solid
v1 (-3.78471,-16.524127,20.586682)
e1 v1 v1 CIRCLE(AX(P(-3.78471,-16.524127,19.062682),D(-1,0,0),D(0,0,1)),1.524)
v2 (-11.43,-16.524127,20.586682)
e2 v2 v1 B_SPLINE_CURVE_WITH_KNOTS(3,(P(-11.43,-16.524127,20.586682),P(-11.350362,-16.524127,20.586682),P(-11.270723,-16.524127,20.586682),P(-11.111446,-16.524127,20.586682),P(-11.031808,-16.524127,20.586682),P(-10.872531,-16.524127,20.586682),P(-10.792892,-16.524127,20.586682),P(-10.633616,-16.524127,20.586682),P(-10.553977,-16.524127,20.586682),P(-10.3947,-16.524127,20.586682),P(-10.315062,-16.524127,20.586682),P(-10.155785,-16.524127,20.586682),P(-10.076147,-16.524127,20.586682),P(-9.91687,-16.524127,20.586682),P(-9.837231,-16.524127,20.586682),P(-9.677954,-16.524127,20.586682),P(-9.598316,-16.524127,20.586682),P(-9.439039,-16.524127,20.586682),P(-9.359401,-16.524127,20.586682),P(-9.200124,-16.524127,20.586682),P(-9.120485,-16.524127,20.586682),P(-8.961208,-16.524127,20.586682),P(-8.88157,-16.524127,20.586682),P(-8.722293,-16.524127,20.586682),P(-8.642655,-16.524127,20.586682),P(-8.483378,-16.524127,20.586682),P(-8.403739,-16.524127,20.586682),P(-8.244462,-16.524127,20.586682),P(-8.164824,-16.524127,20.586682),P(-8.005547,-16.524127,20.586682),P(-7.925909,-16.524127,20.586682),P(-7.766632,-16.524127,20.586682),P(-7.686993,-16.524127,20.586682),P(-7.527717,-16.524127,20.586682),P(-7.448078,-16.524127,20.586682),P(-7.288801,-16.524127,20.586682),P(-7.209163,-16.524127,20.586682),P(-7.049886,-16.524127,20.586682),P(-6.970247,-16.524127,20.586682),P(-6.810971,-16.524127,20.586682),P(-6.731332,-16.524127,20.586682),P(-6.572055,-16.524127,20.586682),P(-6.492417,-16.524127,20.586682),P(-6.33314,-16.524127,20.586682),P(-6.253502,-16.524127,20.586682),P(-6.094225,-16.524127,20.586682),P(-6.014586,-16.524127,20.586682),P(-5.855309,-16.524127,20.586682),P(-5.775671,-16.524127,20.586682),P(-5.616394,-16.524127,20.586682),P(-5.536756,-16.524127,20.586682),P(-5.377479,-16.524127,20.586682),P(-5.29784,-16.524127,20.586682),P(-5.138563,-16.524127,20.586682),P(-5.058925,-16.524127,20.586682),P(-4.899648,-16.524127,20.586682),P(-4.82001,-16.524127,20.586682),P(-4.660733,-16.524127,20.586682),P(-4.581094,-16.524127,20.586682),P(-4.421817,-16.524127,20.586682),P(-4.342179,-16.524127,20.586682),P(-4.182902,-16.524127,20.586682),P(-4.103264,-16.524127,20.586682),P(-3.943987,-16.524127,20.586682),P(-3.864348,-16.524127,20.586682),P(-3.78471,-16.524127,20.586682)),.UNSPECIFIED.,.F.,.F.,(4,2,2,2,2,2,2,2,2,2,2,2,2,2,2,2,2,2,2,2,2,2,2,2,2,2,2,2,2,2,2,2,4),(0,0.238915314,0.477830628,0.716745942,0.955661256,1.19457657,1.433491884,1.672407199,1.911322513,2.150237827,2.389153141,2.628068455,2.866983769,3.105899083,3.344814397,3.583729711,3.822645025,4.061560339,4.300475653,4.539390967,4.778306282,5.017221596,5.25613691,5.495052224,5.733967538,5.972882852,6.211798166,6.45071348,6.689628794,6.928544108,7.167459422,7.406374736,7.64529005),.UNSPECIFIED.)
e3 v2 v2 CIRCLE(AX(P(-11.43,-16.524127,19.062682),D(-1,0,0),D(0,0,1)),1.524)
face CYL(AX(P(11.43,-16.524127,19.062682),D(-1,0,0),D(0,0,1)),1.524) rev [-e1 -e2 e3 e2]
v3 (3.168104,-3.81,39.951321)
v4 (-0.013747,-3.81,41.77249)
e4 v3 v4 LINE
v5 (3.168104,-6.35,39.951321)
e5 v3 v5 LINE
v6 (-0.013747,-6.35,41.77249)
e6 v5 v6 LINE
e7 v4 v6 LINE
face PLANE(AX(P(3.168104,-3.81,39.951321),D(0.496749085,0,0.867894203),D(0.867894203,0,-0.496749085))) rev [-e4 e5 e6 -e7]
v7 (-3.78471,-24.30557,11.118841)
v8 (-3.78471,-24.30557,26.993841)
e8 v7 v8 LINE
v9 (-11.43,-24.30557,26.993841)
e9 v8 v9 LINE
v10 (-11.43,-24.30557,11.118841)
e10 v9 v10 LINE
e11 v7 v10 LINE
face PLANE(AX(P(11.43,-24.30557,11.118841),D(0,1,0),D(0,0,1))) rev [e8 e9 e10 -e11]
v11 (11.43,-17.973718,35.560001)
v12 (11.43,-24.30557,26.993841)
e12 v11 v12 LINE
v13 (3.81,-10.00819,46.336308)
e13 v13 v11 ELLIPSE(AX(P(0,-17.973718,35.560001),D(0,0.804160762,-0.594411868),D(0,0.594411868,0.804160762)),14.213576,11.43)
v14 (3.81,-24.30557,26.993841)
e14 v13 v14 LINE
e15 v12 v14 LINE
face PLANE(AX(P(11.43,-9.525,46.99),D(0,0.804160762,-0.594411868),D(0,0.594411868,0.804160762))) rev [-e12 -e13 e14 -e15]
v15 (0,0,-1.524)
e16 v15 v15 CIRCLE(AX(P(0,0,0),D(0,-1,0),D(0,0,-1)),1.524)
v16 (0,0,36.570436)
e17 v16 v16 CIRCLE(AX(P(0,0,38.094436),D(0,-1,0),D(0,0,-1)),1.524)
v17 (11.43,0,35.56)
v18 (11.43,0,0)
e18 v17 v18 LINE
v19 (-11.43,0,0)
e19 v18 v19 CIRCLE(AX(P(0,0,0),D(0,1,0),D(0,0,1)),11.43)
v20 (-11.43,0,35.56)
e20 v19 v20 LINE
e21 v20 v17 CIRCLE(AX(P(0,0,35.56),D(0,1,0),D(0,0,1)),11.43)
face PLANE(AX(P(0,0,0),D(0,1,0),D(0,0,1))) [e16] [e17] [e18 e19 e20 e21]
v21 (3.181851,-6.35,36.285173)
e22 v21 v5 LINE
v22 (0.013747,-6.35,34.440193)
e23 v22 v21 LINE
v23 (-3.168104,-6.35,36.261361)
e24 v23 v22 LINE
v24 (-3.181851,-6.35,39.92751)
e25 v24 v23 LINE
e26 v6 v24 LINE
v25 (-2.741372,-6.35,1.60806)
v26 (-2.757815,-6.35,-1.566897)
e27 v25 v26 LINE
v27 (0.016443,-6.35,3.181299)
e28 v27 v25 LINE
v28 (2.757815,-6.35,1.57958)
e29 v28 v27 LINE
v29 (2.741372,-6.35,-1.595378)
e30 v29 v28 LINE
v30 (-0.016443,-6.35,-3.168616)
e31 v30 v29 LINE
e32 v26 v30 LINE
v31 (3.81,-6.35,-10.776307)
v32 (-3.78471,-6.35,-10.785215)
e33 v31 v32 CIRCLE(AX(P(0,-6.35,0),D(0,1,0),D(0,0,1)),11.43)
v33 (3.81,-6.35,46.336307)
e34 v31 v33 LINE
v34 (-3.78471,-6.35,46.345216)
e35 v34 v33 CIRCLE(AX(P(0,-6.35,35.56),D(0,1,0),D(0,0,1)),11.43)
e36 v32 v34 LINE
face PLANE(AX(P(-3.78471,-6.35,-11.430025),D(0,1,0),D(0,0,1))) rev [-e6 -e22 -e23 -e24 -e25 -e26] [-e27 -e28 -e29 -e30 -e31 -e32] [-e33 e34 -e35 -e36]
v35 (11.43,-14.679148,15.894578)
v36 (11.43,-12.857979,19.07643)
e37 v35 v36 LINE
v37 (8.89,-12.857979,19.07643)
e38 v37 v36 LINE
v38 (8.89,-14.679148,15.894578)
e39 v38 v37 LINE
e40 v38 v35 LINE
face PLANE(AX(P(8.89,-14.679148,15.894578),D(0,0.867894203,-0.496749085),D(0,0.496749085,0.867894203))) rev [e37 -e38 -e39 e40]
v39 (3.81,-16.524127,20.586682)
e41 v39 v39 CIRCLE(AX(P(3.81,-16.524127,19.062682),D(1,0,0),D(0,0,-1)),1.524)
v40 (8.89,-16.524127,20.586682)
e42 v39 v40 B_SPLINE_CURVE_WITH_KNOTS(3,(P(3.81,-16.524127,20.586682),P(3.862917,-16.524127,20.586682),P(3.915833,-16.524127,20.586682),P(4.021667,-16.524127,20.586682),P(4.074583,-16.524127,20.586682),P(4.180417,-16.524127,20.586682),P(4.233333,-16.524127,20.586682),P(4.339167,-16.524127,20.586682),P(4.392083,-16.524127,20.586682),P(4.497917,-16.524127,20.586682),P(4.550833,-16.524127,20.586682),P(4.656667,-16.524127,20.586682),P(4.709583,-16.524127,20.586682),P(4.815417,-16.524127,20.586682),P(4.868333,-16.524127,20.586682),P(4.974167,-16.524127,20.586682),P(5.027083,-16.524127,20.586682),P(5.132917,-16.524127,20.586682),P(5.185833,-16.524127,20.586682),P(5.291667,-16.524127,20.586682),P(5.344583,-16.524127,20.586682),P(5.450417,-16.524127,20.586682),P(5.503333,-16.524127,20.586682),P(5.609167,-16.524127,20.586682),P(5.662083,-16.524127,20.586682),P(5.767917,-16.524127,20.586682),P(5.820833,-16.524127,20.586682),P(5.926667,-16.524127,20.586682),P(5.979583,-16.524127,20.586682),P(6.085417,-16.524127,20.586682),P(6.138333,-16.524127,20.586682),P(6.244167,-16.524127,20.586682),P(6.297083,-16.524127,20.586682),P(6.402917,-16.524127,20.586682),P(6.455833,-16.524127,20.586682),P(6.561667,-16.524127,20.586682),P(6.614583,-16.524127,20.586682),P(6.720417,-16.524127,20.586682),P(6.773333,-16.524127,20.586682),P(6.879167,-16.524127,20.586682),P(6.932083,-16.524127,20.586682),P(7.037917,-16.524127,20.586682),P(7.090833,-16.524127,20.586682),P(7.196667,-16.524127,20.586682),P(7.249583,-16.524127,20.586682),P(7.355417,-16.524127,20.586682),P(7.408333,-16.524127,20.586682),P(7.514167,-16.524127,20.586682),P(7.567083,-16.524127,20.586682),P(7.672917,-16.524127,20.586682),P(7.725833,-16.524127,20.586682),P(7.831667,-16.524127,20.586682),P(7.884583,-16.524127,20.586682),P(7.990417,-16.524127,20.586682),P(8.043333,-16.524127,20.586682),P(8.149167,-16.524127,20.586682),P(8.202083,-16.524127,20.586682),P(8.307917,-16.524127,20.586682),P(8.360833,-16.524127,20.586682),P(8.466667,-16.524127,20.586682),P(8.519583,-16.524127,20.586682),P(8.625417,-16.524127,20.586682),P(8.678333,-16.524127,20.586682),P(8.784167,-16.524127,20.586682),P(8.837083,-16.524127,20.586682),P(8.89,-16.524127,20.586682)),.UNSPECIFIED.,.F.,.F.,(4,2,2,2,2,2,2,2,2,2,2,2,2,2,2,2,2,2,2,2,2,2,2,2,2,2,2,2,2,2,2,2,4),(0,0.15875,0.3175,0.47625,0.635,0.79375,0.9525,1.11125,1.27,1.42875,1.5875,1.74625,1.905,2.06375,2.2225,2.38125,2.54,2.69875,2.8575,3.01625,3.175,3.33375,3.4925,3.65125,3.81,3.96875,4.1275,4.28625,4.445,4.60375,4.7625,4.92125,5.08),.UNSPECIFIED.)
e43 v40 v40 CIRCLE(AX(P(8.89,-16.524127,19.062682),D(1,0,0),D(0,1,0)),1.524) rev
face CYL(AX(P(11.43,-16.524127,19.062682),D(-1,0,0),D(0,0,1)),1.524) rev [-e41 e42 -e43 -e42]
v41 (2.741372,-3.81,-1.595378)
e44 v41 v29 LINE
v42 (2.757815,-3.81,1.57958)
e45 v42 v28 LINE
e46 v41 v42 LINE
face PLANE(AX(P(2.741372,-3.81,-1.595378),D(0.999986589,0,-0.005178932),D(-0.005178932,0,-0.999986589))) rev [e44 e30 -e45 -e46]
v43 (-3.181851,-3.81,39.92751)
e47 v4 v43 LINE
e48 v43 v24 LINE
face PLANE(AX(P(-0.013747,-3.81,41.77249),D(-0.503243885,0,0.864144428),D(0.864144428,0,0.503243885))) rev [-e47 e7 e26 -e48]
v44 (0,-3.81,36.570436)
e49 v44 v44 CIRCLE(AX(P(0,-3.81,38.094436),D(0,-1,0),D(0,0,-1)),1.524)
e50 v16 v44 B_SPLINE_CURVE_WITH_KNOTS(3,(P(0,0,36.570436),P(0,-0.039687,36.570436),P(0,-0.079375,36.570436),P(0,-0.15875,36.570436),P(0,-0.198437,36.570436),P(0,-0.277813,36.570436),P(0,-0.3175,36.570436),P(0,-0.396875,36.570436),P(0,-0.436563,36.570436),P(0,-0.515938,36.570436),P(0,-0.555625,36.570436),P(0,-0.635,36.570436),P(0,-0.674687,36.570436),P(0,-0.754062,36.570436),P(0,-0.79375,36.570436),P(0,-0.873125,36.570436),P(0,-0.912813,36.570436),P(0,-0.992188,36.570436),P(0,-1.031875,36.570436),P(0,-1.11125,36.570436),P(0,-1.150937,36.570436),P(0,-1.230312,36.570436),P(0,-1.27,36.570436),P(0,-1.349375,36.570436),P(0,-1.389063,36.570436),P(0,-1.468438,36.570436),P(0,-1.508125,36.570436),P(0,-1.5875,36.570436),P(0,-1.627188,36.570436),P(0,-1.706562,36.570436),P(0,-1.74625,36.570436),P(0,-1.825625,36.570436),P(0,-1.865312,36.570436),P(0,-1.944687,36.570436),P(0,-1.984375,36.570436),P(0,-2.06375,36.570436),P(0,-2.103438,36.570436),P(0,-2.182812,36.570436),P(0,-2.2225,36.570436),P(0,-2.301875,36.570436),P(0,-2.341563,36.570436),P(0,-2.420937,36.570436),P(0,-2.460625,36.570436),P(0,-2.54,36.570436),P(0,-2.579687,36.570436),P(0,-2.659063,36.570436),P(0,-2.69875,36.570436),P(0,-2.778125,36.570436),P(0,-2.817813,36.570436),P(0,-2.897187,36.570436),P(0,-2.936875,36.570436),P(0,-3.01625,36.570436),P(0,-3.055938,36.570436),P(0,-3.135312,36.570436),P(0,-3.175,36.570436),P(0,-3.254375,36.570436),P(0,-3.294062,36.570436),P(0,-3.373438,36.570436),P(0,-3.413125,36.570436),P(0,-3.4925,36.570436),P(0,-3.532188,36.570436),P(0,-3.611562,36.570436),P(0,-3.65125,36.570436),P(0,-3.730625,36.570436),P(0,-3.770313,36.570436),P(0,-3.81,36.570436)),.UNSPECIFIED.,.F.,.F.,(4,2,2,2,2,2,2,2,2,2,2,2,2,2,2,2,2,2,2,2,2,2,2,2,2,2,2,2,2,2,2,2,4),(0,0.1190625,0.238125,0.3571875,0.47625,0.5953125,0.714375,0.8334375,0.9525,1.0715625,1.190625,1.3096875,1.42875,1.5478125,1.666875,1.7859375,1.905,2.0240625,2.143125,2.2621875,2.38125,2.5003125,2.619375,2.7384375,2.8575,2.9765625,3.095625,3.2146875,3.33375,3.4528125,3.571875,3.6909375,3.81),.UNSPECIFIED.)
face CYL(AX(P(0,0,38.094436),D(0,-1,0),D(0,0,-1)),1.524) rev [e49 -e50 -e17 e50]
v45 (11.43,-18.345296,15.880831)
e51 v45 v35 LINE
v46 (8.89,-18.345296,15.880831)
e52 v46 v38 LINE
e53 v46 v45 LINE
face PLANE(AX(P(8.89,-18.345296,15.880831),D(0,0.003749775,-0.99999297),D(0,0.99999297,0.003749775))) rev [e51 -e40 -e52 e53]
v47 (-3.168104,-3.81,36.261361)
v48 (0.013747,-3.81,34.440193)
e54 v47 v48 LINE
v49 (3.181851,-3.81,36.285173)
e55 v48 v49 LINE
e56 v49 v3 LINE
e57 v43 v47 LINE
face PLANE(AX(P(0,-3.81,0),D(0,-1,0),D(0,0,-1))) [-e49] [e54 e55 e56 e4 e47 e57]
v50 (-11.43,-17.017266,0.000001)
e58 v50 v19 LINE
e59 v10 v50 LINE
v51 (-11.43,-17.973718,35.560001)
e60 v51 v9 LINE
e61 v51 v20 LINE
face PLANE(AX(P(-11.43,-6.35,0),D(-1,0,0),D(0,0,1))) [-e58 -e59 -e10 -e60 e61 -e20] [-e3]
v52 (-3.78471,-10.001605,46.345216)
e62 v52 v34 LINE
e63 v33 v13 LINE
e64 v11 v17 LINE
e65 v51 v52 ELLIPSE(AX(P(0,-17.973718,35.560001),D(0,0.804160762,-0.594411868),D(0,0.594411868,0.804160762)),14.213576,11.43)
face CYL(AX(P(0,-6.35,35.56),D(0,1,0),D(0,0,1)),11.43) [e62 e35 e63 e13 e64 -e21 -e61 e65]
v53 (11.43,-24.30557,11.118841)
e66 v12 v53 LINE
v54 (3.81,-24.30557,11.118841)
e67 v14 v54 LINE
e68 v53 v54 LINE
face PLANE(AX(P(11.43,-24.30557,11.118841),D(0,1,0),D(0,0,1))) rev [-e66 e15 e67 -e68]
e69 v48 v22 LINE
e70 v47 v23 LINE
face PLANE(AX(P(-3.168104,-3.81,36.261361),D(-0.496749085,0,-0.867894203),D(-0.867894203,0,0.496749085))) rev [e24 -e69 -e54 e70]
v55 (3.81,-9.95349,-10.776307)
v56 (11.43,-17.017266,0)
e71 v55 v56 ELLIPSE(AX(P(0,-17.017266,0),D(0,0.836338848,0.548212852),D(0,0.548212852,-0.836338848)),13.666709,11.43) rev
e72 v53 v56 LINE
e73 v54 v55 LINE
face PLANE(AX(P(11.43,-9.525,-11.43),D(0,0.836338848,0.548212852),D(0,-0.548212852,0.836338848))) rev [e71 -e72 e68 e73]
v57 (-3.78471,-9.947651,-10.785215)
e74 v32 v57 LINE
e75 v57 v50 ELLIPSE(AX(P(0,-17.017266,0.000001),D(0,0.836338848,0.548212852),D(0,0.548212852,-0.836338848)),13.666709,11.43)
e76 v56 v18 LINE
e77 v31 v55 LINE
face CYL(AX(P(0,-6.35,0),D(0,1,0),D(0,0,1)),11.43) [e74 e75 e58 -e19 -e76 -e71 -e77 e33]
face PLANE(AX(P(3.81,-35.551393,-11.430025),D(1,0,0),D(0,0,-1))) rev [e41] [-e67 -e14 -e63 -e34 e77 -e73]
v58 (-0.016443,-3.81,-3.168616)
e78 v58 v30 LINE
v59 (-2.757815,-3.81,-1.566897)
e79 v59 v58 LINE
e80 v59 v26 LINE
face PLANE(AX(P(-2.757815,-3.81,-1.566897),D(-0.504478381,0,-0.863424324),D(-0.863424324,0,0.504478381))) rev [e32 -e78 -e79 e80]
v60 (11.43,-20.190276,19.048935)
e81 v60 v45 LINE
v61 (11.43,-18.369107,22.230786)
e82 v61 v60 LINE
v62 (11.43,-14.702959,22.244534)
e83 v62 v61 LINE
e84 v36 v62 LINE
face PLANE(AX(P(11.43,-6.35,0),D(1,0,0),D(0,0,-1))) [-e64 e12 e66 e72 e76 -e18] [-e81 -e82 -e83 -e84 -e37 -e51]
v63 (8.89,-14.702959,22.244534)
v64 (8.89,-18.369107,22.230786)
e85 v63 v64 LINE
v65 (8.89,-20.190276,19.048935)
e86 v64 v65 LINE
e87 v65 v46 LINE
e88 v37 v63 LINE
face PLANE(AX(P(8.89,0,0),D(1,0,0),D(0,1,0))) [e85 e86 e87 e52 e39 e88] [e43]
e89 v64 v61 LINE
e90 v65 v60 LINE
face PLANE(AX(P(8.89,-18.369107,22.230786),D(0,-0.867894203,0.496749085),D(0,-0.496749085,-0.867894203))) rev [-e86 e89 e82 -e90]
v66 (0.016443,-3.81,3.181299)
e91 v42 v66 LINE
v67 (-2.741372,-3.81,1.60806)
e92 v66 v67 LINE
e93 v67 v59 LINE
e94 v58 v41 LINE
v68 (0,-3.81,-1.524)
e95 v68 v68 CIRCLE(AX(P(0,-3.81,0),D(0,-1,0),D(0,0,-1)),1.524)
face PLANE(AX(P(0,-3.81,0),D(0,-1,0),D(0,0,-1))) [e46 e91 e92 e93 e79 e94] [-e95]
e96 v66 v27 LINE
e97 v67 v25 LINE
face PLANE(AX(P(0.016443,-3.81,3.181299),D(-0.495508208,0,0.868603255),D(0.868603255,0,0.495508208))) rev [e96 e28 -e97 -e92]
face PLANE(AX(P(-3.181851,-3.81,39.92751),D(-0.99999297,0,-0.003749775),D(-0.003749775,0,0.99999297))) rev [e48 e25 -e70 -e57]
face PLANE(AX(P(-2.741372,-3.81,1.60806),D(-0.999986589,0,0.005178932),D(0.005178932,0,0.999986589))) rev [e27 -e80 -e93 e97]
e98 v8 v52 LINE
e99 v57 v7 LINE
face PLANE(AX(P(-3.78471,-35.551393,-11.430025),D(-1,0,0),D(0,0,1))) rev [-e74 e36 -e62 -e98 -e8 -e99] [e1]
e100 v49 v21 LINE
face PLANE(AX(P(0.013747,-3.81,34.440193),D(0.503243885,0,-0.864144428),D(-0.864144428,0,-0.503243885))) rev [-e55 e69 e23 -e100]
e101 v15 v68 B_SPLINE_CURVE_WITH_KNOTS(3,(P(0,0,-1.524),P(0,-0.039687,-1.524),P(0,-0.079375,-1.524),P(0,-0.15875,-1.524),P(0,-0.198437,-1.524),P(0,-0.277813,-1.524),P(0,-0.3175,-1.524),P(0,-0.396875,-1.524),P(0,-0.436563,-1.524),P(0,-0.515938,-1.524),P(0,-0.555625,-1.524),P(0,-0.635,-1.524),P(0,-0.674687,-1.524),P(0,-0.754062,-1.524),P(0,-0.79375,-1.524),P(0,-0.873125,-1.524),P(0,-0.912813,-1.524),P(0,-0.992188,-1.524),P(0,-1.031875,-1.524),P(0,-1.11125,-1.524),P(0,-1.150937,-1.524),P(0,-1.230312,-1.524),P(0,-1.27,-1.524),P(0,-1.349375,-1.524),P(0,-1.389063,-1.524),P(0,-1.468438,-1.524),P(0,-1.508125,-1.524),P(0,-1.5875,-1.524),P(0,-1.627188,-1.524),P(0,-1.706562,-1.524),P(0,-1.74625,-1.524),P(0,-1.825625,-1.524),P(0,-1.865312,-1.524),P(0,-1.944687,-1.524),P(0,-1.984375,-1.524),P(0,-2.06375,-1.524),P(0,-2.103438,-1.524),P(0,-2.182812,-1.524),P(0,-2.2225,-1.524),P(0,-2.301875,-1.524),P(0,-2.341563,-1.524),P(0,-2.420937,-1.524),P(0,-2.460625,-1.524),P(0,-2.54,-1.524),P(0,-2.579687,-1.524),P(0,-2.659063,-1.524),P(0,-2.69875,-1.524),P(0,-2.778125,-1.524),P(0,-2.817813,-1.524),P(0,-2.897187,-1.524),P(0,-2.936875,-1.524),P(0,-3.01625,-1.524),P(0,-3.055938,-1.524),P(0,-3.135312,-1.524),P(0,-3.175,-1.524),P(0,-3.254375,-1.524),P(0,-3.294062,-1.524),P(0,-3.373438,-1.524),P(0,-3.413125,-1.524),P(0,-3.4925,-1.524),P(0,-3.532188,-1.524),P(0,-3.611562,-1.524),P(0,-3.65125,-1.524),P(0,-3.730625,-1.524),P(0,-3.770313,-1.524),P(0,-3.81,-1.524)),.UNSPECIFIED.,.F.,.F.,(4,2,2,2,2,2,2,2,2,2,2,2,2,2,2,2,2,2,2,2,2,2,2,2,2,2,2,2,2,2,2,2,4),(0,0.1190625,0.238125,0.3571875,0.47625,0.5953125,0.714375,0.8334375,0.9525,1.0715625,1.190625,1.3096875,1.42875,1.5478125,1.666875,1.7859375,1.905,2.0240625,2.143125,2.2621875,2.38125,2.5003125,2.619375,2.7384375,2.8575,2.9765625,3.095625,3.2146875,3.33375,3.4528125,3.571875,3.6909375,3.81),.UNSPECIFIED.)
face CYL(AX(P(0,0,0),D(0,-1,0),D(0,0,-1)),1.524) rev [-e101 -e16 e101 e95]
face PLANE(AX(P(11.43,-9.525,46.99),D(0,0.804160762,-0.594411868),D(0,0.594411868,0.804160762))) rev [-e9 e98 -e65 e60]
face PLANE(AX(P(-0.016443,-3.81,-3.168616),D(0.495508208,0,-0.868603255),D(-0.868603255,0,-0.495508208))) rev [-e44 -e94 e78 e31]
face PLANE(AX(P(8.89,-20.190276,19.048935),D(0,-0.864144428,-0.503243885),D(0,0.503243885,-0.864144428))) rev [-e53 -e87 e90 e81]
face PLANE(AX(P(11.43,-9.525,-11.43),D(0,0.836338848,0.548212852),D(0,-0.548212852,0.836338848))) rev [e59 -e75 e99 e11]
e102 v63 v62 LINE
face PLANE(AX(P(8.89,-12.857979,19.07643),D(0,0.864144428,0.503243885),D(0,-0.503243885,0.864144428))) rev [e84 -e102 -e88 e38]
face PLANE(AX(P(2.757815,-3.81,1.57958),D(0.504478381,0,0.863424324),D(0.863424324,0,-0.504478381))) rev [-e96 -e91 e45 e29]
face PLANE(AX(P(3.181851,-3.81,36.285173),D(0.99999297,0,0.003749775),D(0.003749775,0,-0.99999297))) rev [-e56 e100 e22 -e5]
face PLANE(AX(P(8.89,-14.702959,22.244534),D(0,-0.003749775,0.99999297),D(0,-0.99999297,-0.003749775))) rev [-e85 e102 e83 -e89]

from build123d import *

# Parameters (mm, degrees)
BOSS_EXTRUDE1_DEPTH      = 6.35
BOSS_EXTRUDE3_DEPTH      = 11.43
BOSS_EXTRUDE3_DEPTH_BACK = 11.43
CUT_EXTRUDE13_DEPTH      = 55.124538916
CUT_EXTRUDE13_DEPTH_BACK = 55.124538916
SKETCH11_W               = 7.59470995
SKETCH11_H               = 29.201393096
CUT_EXTRUDE19_START      = -17.955569585
CUT_EXTRUDE19_DEPTH      = 17.955569585
SKETCH18_R               = 1.524
CUT_EXTRUDE22_DEPTH      = 58.631592142
CUT_EXTRUDE23_DEPTH      = 2.54
SKETCH22_R               = 1.524
CUT_EXTRUDE24_DEPTH      = 53.524026622
CUT_EXTRUDE25_DEPTH      = 2.54


# Read off the part's stored shape, not the designer's step: Cut-Extrude19
with BuildPart() as part:
    # Sketch1 → Boss-Extrude1 (new body)
    with BuildSketch(Plane(origin=(0, 0, 0), x_dir=(1, 0, 0), z_dir=(0, 1, 0))):
        with BuildLine():
            Line((11.43, 0), (11.43, -35.56))
            ThreePointArc((11.43, -35.56), (0, -46.99), (-11.43, -35.56))
            Line((-11.43, -35.56), (-11.43, 0))
            ThreePointArc((-11.43, 0), (0, 11.43), (11.43, 0))
        make_face()
    extrude(amount=-BOSS_EXTRUDE1_DEPTH)

    # Sketch2 → Boss-Extrude3 (add, two sides: drawn at the far end of the back side and taken through both)
    with BuildSketch(Plane(origin=(0, 0, 0), x_dir=(0, 0, -1), z_dir=(1, 0, 0)).offset(-BOSS_EXTRUDE3_DEPTH_BACK)):
        Polygon((-46.99, -6.35), (11.43, -6.35), (11.43, -9.525), (-11.11884122, -24.305569585), (-26.99384122, -24.305569585), (-46.99, -9.525), align=None)
    extrude(amount=BOSS_EXTRUDE3_DEPTH + BOSS_EXTRUDE3_DEPTH_BACK)

    # Sketch11 → Cut-Extrude13 (cut, two sides: drawn at the far end of the back side and taken through both)
    with BuildSketch(Plane.XY.offset(-CUT_EXTRUDE13_DEPTH_BACK)):
        with Locations((0.012645025, -20.950696548)):
            Rectangle(SKETCH11_W, SKETCH11_H)
    extrude(amount=CUT_EXTRUDE13_DEPTH + CUT_EXTRUDE13_DEPTH_BACK, mode=Mode.SUBTRACT)

    # Cut-Extrude19 outline → Cut-Extrude19 (cut)
    with BuildSketch(Plane(origin=(0, -6.35, 0), x_dir=(1, 0, 0), z_dir=(0, 1, 0)).offset(CUT_EXTRUDE19_START)):
        with BuildLine():
            Line((11.43, 11.43), (3.81, 11.43))
            Line((3.81, 11.43), (3.81, 10.776307345))
            ThreePointArc((3.81, 10.776307345), (9.33255592, 6.599113577), (11.43, 0))
            Line((11.43, 0), (11.43, 11.43))
        make_face()
        with BuildLine():
            ThreePointArc((11.43, -35.56), (9.332555866, -42.159113654), (3.809999822, -46.336307408))
            Line((3.809999822, -46.336307408), (3.81, -46.99))
            Line((3.81, -46.99), (11.43, -46.99))
            Line((11.43, -46.99), (11.43, -35.56))
        make_face()
        with BuildLine():
            ThreePointArc((-11.43, -5.66e-07), (-9.324809404, 6.610055188), (-3.78470995, 10.785215371))
            Line((-3.78470995, 10.785215371), (-3.78470995, 11.43))
            Line((-3.78470995, 11.43), (-11.43, 11.43))
            Line((-11.43, 11.43), (-11.43, -5.66e-07))
        make_face()
        with BuildLine():
            Line((-3.78470995, -46.99), (-3.784709773, -46.345215433))
            ThreePointArc((-3.784709773, -46.345215433), (-9.324809186, -42.170055495), (-11.43, -35.56))
            Line((-11.43, -35.56), (-11.43, -46.99))
            Line((-11.43, -46.99), (-3.78470995, -46.99))
        make_face()
    extrude(amount=CUT_EXTRUDE19_DEPTH, mode=Mode.SUBTRACT)

    # Sketch18 → Cut-Extrude22 (cut, through all)
    with BuildSketch(Plane.ZY.offset(11.43)):
        with Locations((19.062682441, -16.524127344)):
            Circle(SKETCH18_R)
    extrude(amount=-CUT_EXTRUDE22_DEPTH, mode=Mode.SUBTRACT)

    # Sketch20 → Cut-Extrude23 (cut)
    with BuildSketch(Plane.XZ.offset(6.35)):
        Polygon((0.016443108, 3.181298641), (-2.741372229, 1.60806008), (-2.757815336, -1.566897341), (-0.016443108, -3.1686162), (2.741372229, -1.595377639), (2.757815336, 1.579579782), align=None)
        Polygon((0.013747327, 34.440192786), (3.181851342, 36.285172538), (3.168104015, 39.951320972), (-0.013747327, 41.772489655), (-3.181851342, 39.927509903), (-3.168104015, 36.261361468), align=None)
    extrude(amount=-CUT_EXTRUDE23_DEPTH, mode=Mode.SUBTRACT)

    # Sketch22 → Cut-Extrude24 (cut, through all)
    with BuildSketch(Plane.XZ.offset(3.81)):
        with Locations(Location((0, 0, 0), (0, 0, 270))):
            Circle(SKETCH22_R)
        with Locations(Location((0, 38.094435686, 0), (0, 0, 270))):
            Circle(SKETCH22_R)
    extrude(amount=-CUT_EXTRUDE24_DEPTH, mode=Mode.SUBTRACT)

    # Sketch23 → Cut-Extrude25 (cut)
    with BuildSketch(Plane(origin=(11.43, 0, 0), x_dir=(0, 0, -1), z_dir=(1, 0, 0))):
        Polygon((-19.048935114, -20.190275778), (-15.880831099, -18.345296026), (-15.894578426, -14.679147592), (-19.076429768, -12.857978909), (-22.244533783, -14.702958661), (-22.230786456, -18.369107096), align=None)
    extrude(amount=-CUT_EXTRUDE25_DEPTH, mode=Mode.SUBTRACT)


solid = part.part
